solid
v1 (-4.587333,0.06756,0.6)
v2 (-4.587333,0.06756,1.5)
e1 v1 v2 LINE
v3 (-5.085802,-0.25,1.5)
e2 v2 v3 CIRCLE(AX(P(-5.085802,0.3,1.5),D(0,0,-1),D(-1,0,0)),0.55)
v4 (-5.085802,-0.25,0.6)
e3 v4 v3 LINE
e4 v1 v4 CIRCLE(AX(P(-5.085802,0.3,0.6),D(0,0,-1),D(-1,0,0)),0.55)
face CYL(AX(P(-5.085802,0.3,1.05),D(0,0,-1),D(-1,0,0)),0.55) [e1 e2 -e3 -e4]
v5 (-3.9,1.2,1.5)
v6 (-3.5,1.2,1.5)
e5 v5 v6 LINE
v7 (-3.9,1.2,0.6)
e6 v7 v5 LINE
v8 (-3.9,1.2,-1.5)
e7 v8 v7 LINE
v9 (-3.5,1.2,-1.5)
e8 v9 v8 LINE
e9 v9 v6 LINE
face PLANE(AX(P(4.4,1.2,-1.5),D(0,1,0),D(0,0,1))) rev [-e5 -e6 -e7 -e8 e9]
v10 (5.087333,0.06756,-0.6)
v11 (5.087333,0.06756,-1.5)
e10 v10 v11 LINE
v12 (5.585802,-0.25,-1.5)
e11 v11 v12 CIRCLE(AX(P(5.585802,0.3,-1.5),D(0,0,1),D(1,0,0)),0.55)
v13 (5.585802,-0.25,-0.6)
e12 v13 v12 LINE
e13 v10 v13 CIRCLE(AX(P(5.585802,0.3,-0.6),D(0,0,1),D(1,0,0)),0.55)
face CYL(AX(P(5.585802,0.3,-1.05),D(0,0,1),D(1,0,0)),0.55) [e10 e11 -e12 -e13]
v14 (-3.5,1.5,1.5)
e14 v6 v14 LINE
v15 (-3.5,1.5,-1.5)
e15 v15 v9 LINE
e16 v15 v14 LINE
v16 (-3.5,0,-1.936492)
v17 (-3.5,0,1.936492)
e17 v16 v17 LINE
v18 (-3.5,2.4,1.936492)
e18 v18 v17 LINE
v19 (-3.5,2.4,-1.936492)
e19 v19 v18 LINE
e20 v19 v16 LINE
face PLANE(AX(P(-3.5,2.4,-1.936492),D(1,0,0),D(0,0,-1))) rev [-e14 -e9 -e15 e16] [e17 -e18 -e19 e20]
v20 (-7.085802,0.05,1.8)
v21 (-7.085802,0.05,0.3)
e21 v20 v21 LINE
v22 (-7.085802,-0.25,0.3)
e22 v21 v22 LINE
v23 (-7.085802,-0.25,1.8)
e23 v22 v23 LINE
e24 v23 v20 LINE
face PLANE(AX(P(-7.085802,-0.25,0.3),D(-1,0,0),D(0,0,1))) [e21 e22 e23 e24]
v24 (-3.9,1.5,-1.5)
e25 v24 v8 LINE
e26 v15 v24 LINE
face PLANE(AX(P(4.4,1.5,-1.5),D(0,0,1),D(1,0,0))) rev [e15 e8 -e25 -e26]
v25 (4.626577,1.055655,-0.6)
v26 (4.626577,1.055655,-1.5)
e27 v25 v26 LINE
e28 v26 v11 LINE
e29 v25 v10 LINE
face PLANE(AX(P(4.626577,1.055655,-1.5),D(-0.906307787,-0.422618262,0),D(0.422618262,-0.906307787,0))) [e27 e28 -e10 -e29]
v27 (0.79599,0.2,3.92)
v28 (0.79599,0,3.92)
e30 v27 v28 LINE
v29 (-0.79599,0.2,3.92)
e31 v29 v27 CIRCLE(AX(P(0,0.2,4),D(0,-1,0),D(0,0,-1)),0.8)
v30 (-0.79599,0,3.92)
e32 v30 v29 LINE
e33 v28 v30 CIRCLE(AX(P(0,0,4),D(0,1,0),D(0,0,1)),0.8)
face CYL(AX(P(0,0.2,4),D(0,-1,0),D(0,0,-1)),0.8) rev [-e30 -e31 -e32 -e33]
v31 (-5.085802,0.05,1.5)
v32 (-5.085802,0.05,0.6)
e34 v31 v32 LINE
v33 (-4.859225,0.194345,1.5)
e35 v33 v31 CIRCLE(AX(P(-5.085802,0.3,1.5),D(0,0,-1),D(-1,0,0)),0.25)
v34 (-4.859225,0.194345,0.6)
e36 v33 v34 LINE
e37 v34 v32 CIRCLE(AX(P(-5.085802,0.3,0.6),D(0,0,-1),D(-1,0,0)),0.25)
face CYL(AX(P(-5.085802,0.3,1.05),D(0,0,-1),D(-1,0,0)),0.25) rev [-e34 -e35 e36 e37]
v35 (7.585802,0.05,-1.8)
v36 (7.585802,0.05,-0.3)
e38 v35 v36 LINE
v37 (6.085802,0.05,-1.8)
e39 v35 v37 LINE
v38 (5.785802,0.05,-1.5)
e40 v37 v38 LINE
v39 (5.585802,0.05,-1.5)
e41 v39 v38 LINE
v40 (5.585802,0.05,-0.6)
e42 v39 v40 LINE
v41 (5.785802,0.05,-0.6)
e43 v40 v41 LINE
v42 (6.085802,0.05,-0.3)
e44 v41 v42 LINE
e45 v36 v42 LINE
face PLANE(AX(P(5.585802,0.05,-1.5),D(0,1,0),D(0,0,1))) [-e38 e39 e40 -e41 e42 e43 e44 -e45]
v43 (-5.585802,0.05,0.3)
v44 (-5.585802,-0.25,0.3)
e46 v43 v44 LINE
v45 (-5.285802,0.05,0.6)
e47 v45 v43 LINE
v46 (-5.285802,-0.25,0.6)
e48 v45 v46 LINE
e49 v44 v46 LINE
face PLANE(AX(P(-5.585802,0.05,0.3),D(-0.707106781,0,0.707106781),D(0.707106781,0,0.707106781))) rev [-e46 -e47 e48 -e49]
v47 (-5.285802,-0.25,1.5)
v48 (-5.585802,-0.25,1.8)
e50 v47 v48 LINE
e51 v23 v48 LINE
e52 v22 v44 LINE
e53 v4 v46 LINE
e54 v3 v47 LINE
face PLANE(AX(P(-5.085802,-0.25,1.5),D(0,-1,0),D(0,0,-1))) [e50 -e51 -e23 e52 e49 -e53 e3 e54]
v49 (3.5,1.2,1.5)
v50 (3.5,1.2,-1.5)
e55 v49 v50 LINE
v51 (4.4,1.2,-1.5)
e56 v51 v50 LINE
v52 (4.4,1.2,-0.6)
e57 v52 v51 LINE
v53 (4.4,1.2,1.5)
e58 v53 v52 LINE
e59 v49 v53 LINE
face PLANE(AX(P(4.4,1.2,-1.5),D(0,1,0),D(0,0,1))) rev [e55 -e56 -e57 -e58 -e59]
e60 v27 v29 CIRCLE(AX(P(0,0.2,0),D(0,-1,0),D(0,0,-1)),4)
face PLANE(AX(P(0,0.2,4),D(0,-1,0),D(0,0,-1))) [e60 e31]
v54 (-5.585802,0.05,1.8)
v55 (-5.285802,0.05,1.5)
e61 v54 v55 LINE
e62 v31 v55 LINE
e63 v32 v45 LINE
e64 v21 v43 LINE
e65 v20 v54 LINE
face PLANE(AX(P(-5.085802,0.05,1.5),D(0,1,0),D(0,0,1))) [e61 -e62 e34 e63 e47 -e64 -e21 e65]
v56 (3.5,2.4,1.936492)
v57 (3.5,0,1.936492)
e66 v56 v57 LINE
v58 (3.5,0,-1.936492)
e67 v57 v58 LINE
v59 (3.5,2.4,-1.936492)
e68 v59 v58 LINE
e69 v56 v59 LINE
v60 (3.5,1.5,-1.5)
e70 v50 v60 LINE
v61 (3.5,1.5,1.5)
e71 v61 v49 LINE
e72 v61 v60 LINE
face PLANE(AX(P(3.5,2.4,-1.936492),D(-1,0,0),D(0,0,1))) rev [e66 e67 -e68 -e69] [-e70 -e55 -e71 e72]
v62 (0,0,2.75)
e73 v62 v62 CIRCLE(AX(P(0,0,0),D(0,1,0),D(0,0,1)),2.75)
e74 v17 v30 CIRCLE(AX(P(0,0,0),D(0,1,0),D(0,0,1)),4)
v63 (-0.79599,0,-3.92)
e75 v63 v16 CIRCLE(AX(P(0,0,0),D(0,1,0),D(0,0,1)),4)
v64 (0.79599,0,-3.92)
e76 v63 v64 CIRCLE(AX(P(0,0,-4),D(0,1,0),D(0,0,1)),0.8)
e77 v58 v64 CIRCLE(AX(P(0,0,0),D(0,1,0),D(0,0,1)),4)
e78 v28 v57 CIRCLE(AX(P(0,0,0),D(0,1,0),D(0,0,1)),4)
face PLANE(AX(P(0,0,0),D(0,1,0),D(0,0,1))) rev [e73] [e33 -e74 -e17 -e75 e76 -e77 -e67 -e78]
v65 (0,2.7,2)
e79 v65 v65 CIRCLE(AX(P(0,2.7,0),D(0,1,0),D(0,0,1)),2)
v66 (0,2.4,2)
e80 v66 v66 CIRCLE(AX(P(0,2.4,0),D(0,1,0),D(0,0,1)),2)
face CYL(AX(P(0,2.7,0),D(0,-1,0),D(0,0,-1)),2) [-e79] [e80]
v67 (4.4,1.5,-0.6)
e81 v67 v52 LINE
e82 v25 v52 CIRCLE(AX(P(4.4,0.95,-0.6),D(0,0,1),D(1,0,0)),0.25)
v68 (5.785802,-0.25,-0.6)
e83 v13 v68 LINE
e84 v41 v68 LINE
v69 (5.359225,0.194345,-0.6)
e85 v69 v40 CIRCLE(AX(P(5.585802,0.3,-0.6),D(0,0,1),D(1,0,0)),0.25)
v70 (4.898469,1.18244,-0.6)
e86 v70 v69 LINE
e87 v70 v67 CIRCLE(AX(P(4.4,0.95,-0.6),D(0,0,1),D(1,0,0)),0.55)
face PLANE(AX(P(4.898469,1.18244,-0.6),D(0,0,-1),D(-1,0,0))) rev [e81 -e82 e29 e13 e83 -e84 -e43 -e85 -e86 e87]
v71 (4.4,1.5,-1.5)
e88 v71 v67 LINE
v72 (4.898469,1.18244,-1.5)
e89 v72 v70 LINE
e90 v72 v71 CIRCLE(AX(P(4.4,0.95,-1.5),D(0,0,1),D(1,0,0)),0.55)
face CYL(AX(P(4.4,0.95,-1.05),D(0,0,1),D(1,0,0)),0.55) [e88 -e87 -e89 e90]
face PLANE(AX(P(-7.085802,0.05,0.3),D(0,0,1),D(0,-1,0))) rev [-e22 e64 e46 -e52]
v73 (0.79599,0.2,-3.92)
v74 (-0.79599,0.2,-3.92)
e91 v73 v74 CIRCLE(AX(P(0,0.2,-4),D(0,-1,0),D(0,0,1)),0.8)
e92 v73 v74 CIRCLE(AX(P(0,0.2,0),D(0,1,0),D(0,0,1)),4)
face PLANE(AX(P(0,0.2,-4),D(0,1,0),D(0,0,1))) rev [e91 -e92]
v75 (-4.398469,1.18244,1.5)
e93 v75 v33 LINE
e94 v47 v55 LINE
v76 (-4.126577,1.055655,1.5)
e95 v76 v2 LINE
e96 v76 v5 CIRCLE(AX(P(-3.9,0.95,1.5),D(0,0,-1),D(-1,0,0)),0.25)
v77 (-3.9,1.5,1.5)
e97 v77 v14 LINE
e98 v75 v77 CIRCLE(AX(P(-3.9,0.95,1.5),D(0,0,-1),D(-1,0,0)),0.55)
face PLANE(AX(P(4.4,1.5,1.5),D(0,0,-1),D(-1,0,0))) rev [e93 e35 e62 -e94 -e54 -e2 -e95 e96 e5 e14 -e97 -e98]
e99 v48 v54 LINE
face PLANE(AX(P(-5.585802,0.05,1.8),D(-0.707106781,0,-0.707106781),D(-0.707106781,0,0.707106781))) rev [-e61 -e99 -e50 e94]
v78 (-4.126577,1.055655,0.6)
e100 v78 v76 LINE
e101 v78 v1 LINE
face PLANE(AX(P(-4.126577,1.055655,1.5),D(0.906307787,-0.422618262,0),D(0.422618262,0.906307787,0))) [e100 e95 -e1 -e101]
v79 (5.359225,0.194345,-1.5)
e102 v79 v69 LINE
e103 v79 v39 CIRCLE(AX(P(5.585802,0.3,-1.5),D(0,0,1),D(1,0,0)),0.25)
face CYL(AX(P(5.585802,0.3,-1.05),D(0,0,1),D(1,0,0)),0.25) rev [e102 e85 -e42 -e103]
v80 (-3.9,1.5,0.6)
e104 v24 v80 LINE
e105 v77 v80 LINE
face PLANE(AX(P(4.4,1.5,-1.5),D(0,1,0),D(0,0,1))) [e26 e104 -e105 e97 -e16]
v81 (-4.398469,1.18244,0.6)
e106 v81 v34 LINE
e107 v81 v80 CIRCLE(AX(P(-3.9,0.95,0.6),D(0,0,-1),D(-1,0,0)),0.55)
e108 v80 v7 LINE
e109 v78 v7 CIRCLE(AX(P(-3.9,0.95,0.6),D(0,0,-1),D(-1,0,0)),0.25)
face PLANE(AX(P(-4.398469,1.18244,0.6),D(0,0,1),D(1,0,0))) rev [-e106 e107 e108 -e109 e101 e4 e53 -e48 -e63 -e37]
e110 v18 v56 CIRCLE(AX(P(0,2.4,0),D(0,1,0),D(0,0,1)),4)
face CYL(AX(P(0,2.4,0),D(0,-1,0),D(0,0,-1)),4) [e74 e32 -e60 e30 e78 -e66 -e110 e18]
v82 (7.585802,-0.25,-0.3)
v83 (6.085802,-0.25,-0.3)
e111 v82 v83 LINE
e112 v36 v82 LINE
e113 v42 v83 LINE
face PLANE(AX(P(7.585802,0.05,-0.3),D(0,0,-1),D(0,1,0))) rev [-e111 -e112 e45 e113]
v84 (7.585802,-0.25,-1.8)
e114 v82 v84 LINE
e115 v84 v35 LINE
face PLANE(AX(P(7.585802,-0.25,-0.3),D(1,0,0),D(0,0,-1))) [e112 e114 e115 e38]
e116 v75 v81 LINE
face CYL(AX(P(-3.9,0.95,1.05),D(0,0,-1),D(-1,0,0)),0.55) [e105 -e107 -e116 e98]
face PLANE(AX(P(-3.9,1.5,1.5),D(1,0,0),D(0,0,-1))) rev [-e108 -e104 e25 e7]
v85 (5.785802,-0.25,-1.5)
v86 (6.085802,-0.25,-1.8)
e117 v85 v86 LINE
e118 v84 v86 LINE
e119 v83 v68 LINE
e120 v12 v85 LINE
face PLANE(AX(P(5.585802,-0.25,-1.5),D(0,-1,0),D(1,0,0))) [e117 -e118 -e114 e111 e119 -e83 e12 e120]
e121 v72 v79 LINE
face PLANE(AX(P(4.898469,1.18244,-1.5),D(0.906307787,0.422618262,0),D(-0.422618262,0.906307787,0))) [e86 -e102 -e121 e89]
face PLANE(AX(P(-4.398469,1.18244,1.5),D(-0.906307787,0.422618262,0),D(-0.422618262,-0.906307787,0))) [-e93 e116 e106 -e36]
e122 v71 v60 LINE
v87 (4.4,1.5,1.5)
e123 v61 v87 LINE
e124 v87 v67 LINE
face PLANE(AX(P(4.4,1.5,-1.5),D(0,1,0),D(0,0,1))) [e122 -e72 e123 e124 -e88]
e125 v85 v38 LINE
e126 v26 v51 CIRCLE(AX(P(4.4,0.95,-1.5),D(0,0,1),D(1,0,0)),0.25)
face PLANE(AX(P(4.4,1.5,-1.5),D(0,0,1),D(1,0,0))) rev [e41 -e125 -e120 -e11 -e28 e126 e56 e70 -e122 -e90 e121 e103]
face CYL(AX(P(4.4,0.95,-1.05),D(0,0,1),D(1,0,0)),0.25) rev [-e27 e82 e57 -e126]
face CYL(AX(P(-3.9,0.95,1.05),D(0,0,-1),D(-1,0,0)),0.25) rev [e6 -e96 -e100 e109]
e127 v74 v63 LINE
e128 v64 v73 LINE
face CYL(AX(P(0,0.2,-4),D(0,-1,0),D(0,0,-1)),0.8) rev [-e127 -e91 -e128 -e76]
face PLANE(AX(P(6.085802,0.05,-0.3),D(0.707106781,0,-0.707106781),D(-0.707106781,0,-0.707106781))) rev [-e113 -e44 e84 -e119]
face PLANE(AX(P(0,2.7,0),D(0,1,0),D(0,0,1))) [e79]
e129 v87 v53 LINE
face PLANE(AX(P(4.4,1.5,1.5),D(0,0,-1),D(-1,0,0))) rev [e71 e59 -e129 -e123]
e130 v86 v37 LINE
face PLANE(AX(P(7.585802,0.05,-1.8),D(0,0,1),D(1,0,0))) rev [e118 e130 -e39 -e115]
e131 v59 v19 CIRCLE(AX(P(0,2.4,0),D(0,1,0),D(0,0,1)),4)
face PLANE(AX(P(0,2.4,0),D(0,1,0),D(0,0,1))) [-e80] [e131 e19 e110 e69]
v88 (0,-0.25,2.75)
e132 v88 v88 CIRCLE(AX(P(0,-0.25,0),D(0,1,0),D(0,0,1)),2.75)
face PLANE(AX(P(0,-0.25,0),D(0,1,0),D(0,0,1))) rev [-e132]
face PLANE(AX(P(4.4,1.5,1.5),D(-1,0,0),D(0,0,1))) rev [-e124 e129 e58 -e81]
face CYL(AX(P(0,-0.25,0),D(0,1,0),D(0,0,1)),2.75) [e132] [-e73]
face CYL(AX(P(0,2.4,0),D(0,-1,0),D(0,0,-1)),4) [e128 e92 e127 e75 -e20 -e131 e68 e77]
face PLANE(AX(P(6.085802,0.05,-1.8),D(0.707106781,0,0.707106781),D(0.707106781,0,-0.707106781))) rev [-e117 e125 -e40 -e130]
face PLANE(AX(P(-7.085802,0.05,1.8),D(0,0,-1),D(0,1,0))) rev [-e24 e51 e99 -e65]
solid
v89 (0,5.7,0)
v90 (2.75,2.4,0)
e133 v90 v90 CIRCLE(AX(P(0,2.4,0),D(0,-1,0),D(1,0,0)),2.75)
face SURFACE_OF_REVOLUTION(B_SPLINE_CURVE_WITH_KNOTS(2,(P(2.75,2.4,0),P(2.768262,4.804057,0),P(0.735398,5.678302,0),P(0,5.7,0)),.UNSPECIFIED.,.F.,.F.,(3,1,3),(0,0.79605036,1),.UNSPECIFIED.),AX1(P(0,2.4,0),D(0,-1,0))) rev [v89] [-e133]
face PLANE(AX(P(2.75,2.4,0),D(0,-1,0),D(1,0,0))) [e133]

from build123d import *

# Parameters (mm, degrees)
BOSS_EXTRUDE1_DEPTH = 2.4
SKETCH2_R           = 2.75
BOSS_EXTRUDE2_DEPTH = 0.25
SKETCH3_R           = 2
BOSS_EXTRUDE3_DEPTH = 0.3
SKETCH5_W           = 8.3
SKETCH5_H           = 3
BOSS_EXTRUDE4_DEPTH = 0.15
SKETCH6_W           = 0.9
SKETCH6_H           = 0.3
SKETCH8_W           = 0.9
SKETCH8_H           = 0.3
SKETCH10_W          = 1.5
SKETCH10_H          = 0.3
BOSS_EXTRUDE5_DEPTH = 1.8
SKETCH11_W          = 1.5
SKETCH11_H          = 0.3
BOSS_EXTRUDE6_DEPTH = 1.8
CHAMFER1_SIZE       = 0.3
SKETCH12_R          = 0.8
CUT_EXTRUDE1_DEPTH  = 0.2


with BuildPart() as part:
    # Sketch1 → Boss-Extrude1 (new body)
    with BuildSketch(Plane(origin=(0, 0, 0), x_dir=(1, 0, 0), z_dir=(0, 1, 0))):
        with BuildLine():
            Line((-3.5, 1.936491673), (-3.5, -1.936491673))
            ThreePointArc((-3.5, -1.936491673), (0, -4), (3.5, -1.936491673))
            Line((3.5, -1.936491673), (3.5, 1.936491673))
            ThreePointArc((3.5, 1.936491673), (0, 4), (-3.5, 1.936491673))
        make_face()
    extrude(amount=BOSS_EXTRUDE1_DEPTH)

    # Sketch2 → Boss-Extrude2 (add)
    with BuildSketch(Plane(origin=(0, 0, 0), x_dir=(1, 0, 0), z_dir=(0, 1, 0))):
        with Locations(Location((0, 0, 0), (0, 0, 270))):
            Circle(SKETCH2_R)
    extrude(amount=-BOSS_EXTRUDE2_DEPTH)

    # Sketch3 → Boss-Extrude3 (add)
    with BuildSketch(Plane(origin=(0, 2.4, 0), x_dir=(1, 0, 0), z_dir=(0, 1, 0))):
        with Locations(Location((0, 0, 0), (0, 0, 270))):
            Circle(SKETCH3_R)
    extrude(amount=BOSS_EXTRUDE3_DEPTH)

    # Sketch5 → Boss-Extrude4 (add, symmetric)
    with BuildSketch(Plane(origin=(0, 1.35, 0), x_dir=(-1, 0, 0), z_dir=(0, 1, 0))):
        with Locations((-0.25, 0)):
            Rectangle(SKETCH5_W, SKETCH5_H)
    extrude(amount=BOSS_EXTRUDE4_DEPTH, both=True)

    # Sweep2: sweep along a path in Sketch7
    with BuildLine(Plane.XY.offset(-1.05)) as sweep2_path:
        Line((5.785802313, -0.1), (5.585802313, -0.1))
        ThreePointArc((5.585802313, -0.1), (5.37088247, -0.037356578), (5.223279198, 0.130952695))
        Line((5.223279198, 0.130952695), (4.762523115, 1.119047305))
        ThreePointArc((4.762523115, 1.119047305), (4.614919843, 1.287356578), (4.4, 1.35))
    # Sketch6 → Sweep2 (sweep)
    with BuildSketch(Plane(origin=(4.4, 0, 0), x_dir=(0, 0, -1), z_dir=(1, 0, 0))):
        with Locations((1.05, 1.35)):
            Rectangle(SKETCH6_W, SKETCH6_H)
    sweep(path=sweep2_path.line)

    # Sweep3: sweep along a path in Sketch9
    with BuildLine(Plane.XY.offset(1.05)) as sweep3_path:
        Line((-5.285802313, -0.1), (-5.085802313, -0.1))
        ThreePointArc((-5.085802313, -0.1), (-4.87088247, -0.037356578), (-4.723279198, 0.130952695))
        Line((-4.723279198, 0.130952695), (-4.262523115, 1.119047305))
        ThreePointArc((-4.262523115, 1.119047305), (-4.114919843, 1.287356578), (-3.9, 1.35))
    # Sketch8 → Sweep3 (sweep)
    with BuildSketch(Plane.ZY.offset(3.9)):
        with Locations((1.05, 1.35)):
            Rectangle(SKETCH8_W, SKETCH8_H)
    sweep(path=sweep3_path.line)

    # Sketch10 → Boss-Extrude5 (add)
    with BuildSketch(Plane.ZY.offset(5.285802313)):
        with Locations((1.05, -0.1)):
            Rectangle(SKETCH10_W, SKETCH10_H)
    extrude(amount=BOSS_EXTRUDE5_DEPTH)

    # Sketch11 → Boss-Extrude6 (add)
    with BuildSketch(Plane(origin=(5.785802313, 0, 0), x_dir=(0, 0, -1), z_dir=(1, 0, 0))):
        with Locations((1.05, -0.1)):
            Rectangle(SKETCH11_W, SKETCH11_H)
    extrude(amount=BOSS_EXTRUDE6_DEPTH)

    # Chamfer1
    chamfer1_edges = [part.edges().sort_by_distance(p)[0] for p in [
        (5.785802313, -0.1, -0.3),
        (5.785802313, -0.1, -1.8),
        (-5.285802313, -0.1, 0.3),
        (-5.285802313, -0.1, 1.8),
    ]]
    chamfer(chamfer1_edges, length=CHAMFER1_SIZE - 0.0001)  # a hair under: the kernel refuses the full size

    # Sketch12 → Cut-Extrude1 (cut)
    with BuildSketch(Plane.XZ):
        with Locations((0, 4)):
            Circle(SKETCH12_R)
        with Locations((0, -4)):
            Circle(SKETCH12_R)
    extrude(amount=-CUT_EXTRUDE1_DEPTH, mode=Mode.SUBTRACT)


with BuildPart() as body_2:
    # Sketch4 → Revolve1 (revolve)
    with BuildSketch(Plane.XY):
        with BuildLine():
            Line((0, 2.4), (0, 5.7))
            add(Edge.make_bspline(
                [(2.75, 2.4), (2.768262319, 4.804056581), (0.735398067, 5.678302049), (0, 5.7)],
                knots=[0, 0, 0, 0.79605036, 1, 1, 1], degree=2))
            Line((2.75, 2.4), (0, 2.4))
        make_face()
    revolve(axis=Axis((0, 2.4, 0), (0, 1, 0)))


solid = Compound([part.part, body_2.part])
